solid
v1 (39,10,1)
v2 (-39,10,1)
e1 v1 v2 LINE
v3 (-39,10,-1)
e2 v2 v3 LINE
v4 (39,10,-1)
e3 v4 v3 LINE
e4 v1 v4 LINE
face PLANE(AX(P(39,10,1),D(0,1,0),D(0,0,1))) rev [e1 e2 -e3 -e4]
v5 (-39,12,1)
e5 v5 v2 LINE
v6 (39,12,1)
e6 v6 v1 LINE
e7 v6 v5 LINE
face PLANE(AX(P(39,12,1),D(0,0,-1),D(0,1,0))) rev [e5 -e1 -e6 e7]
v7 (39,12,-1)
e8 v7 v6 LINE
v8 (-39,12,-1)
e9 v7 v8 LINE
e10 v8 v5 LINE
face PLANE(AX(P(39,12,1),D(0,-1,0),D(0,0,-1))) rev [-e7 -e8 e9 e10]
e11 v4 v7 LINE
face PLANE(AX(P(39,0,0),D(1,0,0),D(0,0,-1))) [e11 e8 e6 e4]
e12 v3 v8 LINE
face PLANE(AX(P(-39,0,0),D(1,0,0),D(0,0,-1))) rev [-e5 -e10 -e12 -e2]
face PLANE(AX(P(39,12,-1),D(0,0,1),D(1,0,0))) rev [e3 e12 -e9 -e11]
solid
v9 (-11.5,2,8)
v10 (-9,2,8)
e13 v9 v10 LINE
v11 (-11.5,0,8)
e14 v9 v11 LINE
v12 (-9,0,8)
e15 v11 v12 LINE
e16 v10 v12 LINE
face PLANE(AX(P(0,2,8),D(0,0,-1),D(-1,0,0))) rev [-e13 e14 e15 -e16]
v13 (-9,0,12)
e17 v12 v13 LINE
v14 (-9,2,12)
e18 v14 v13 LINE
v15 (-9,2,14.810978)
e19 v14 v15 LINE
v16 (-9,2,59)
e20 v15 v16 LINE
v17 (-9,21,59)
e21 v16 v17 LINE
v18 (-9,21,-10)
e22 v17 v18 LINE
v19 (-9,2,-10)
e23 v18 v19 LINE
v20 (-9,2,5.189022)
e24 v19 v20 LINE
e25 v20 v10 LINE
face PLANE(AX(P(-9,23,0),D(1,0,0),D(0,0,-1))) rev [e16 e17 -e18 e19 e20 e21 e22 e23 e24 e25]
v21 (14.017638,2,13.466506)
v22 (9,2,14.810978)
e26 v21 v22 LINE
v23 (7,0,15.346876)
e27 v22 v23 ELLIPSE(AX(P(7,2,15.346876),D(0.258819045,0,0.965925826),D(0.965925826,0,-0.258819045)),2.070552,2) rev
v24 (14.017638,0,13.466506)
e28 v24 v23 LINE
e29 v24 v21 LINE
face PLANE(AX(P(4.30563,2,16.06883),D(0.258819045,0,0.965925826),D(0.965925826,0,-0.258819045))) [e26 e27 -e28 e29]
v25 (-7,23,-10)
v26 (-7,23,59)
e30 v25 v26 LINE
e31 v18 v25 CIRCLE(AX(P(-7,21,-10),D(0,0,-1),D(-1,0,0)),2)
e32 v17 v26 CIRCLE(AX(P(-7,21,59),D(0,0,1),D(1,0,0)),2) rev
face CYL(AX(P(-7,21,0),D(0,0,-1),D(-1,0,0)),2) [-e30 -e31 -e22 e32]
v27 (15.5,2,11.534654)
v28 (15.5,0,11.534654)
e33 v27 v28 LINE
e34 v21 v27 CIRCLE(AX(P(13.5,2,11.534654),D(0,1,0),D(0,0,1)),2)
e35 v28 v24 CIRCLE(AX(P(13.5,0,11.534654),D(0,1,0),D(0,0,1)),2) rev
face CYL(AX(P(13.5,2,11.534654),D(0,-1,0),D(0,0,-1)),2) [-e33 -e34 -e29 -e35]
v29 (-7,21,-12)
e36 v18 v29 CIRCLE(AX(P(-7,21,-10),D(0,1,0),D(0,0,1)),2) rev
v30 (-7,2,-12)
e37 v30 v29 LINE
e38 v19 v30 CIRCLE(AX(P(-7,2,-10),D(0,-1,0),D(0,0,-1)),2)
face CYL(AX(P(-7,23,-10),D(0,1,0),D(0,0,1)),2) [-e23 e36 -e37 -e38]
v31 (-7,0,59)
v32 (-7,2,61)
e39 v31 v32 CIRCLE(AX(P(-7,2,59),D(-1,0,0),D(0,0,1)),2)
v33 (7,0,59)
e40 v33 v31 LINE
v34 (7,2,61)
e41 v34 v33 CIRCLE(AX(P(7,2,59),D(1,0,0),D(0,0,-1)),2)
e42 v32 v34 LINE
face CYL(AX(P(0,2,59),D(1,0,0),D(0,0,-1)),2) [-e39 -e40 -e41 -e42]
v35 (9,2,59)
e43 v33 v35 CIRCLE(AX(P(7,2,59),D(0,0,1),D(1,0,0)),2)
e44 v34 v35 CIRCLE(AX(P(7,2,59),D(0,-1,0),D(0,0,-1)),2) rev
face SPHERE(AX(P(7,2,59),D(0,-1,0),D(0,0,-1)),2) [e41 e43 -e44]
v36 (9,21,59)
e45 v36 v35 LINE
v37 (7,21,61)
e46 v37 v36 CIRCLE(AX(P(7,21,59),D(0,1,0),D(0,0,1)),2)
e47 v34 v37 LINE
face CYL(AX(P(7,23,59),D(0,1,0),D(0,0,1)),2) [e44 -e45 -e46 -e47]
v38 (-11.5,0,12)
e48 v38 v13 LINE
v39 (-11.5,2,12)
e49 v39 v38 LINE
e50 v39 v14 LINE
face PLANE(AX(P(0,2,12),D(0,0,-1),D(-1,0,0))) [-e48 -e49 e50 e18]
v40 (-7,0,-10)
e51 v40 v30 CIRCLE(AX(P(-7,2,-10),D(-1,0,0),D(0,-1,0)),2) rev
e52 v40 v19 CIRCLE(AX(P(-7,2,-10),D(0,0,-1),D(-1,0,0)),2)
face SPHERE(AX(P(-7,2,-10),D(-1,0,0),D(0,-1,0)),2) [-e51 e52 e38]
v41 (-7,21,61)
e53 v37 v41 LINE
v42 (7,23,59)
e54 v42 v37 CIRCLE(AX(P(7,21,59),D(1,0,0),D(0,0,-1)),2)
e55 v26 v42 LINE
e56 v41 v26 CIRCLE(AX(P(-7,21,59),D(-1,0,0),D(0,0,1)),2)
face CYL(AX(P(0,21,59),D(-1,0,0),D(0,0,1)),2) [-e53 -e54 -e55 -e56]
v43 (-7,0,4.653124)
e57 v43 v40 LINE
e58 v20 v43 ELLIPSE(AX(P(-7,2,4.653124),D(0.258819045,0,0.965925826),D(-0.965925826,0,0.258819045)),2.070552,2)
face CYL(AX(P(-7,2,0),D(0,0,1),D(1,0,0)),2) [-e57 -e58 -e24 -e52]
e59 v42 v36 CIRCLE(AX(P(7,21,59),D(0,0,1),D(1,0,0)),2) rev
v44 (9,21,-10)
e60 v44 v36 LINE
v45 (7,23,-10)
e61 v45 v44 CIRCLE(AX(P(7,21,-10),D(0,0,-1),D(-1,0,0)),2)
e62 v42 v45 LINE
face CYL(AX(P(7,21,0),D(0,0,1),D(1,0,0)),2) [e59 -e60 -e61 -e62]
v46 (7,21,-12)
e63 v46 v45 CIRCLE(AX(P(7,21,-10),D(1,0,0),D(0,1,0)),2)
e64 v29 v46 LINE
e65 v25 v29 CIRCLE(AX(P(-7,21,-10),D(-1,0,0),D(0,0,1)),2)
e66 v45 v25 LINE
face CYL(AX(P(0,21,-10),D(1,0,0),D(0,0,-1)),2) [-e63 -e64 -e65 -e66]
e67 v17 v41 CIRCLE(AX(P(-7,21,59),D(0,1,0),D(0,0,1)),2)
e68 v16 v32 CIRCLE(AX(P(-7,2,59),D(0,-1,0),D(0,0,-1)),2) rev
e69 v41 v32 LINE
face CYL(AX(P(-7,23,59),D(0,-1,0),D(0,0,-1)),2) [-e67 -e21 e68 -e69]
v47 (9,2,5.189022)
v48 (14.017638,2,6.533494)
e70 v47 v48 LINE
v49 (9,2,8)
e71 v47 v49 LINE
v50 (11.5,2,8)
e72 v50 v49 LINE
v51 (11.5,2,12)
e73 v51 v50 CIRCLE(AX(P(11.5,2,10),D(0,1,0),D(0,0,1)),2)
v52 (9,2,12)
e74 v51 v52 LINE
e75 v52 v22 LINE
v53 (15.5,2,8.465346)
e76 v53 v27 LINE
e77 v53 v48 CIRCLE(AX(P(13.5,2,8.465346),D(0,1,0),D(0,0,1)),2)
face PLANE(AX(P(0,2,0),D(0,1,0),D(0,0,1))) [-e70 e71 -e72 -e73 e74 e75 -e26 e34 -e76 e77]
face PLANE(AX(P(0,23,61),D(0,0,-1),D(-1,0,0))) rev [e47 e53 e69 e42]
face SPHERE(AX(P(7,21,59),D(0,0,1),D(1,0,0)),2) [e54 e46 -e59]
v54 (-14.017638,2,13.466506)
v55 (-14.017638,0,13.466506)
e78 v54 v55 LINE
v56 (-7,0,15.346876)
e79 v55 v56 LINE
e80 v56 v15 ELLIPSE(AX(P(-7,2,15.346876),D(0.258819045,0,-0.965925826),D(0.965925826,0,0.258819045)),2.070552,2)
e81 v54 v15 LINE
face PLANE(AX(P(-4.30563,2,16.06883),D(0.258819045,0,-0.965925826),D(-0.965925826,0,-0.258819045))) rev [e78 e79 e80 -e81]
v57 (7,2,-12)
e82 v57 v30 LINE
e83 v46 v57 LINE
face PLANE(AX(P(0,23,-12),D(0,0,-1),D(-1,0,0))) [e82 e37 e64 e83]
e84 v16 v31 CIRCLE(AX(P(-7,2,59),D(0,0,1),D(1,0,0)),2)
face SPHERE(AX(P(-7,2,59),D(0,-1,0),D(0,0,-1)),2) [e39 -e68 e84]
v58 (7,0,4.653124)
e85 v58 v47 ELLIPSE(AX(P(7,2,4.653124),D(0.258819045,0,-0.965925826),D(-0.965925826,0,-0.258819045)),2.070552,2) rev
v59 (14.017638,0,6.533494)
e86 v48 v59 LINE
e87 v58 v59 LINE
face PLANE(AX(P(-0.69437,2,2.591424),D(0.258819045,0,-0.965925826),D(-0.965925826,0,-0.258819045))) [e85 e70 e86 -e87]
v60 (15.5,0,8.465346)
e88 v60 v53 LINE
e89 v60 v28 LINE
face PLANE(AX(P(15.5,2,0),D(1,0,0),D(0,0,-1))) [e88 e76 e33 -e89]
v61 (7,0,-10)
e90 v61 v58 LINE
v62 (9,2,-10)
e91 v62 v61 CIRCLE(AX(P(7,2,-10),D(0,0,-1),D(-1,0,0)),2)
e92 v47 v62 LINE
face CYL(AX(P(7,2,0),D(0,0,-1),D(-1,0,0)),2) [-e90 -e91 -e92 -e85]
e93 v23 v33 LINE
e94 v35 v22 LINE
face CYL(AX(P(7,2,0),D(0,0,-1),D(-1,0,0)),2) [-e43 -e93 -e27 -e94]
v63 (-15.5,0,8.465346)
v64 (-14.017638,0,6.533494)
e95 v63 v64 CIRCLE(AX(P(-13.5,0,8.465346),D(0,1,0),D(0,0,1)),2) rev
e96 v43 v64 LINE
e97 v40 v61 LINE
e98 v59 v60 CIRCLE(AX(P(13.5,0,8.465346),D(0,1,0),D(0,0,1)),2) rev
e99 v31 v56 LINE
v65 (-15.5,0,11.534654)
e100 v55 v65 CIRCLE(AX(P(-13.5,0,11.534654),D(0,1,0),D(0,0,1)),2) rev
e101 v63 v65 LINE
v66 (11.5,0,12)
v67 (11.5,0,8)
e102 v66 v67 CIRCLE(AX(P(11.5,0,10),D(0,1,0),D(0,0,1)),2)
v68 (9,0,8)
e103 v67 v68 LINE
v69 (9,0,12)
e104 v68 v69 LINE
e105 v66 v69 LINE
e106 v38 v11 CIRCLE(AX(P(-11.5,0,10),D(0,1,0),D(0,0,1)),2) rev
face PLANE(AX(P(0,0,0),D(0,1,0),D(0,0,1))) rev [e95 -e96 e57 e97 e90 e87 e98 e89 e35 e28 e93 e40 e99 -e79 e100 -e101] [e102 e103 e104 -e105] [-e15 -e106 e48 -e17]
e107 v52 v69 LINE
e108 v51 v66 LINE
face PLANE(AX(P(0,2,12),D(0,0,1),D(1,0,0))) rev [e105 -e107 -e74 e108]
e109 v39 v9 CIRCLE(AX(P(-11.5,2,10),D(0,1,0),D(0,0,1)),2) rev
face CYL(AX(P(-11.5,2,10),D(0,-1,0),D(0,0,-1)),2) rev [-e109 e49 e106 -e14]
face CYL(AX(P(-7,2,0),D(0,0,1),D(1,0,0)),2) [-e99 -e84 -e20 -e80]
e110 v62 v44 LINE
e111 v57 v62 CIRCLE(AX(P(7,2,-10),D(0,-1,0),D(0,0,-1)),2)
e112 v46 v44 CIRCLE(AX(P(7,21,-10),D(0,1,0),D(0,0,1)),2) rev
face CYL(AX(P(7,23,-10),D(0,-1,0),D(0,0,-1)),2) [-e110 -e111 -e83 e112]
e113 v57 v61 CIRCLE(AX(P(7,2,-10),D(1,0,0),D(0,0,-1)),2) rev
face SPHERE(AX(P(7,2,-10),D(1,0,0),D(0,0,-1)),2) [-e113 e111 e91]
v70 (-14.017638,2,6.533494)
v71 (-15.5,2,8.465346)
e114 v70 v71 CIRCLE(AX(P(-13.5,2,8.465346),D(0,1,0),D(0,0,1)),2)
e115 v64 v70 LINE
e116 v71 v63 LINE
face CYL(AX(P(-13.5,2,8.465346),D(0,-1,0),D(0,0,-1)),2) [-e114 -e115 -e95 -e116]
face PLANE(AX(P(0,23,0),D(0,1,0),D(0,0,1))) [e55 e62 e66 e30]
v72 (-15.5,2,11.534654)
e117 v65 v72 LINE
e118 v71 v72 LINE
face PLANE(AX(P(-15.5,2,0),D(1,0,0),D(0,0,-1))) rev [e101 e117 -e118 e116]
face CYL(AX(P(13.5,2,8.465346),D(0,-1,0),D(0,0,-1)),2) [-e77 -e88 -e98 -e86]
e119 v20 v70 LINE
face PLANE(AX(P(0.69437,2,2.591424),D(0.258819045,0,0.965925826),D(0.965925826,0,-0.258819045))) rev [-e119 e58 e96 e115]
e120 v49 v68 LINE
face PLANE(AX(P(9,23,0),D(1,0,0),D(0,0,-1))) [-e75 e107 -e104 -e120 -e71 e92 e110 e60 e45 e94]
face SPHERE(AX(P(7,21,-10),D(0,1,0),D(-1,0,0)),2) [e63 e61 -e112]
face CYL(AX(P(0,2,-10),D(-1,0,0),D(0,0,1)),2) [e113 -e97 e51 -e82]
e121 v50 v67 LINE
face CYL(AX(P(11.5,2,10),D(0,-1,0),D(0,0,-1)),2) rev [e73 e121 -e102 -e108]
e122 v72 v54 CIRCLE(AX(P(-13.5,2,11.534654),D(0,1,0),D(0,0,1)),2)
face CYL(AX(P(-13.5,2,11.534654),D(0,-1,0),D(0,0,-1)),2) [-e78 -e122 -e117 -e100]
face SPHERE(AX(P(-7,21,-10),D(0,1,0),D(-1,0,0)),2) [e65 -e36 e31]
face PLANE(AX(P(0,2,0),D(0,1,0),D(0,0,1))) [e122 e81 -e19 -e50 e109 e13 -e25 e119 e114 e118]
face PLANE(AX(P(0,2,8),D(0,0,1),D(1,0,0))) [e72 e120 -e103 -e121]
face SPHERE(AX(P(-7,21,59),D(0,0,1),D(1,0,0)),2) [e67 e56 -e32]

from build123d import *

# Parameters (mm, degrees)
HOLES_EXTRUDE_DEPTH      = 2
HOLES_EXTRUDE_2_DEPTH    = 2
MOTOR_START              = -9
MOTOR_EXTRUDE_OUTLINE_W  = 23
MOTOR_EXTRUDE_OUTLINE_H  = 73
MOTOR_EXTRUDE_DEPTH      = 18
SKETCH3_W                = 2
SKETCH3_H                = 2
LEFT_SHAFT_EXTRUDE_DEPTH = 39
MOTOR_EDGE_FILLET_R      = 2
HOLES_FILLET_R           = 2


# Read off the part's stored shape, not the designer's step: Motor Extrude
with BuildPart() as part:
    # Bottom Profile Sketch → Holes Extrude (new body)
    with BuildSketch(Plane(origin=(0, 0, 0), x_dir=(1, 0, 0), z_dir=(0, 1, 0))):
        with BuildLine():
            Line((-9, -8), (-9, -5.189022297))
            Line((-9, -5.189022297), (-15.5, -6.930692048))
            Line((-15.5, -6.930692048), (-15.5, -13.069307952))
            Line((-15.5, -13.069307952), (-9, -14.810977703))
            Line((-9, -14.810977703), (-9, -12))
            Line((-9, -12), (-11.5, -12))
            ThreePointArc((-11.5, -12), (-13.5, -10), (-11.5, -8))
            Line((-11.5, -8), (-9, -8))
        make_face()
    extrude(amount=HOLES_EXTRUDE_DEPTH)



with BuildPart() as body_2:
    # Bottom Profile Sketch → Holes Extrude 2 (new body)
    with BuildSketch(Plane(origin=(0, 0, 0), x_dir=(1, 0, 0), z_dir=(0, 1, 0))):
        with BuildLine():
            Line((15.5, -6.930692048), (9, -5.189022297))
            Line((9, -5.189022297), (9, -8))
            Line((9, -8), (11.5, -8))
            ThreePointArc((11.5, -8), (13.5, -10), (11.5, -12))
            Line((11.5, -12), (9, -12))
            Line((9, -12), (9, -14.810977703))
            Line((9, -14.810977703), (15.5, -13.069307952))
            Line((15.5, -13.069307952), (15.5, -6.930692048))
        make_face()
    extrude(amount=HOLES_EXTRUDE_2_DEPTH)


with BuildPart() as part_1:
    add(part.part)

    add(body_2.part)  # Motor Extrude merges body 2
    # Motor Extrude outline → Motor Extrude (add)
    with BuildSketch(Plane.YZ.offset(MOTOR_START)):
        with Locations((11.5, 24.5)):
            Rectangle(MOTOR_EXTRUDE_OUTLINE_W, MOTOR_EXTRUDE_OUTLINE_H)
    extrude(amount=MOTOR_EXTRUDE_DEPTH)

    # Motor Edge Fillet
    motor_edge_fillet_edges = [part_1.edges().sort_by_distance(p)[0] for p in [
        (0, 0, -12),
        (0, 23, -12),
        (9, 11.5, -12),
        (9, 0, -3.405488851),
        (9, 0, 37.905488851),
        (0, 0, 61),
        (0, 23, 61),
        (9, 11.5, 61),
        (-9, 11.5, 61),
        (-9, 0, -3.405488851),
        (-9, 0, 37.905488851),
        (-9, 11.5, -12),
        (-9, 23, 24.5),
        (9, 23, 24.5),
    ]]
    fillet(motor_edge_fillet_edges, radius=MOTOR_EDGE_FILLET_R)

    # Holes Fillet
    holes_fillet_edges = [part_1.edges().sort_by_distance(p)[0] for p in [
        (-15.5, 1, 13.069307952),
        (-15.5, 1, 6.930692048),
        (15.5, 1, 13.069307952),
        (15.5, 1, 6.930692048),
    ]]
    fillet(holes_fillet_edges, radius=HOLES_FILLET_R)


with BuildPart() as body_2_2:
    # Sketch3 → Left Shaft Extrude (new, symmetric)
    with BuildSketch(Plane(origin=(0, 0, 0), x_dir=(0, 0, -1), z_dir=(1, 0, 0))):
        with Locations((0, 11)):
            Rectangle(SKETCH3_W, SKETCH3_H)
    extrude(amount=LEFT_SHAFT_EXTRUDE_DEPTH, both=True)


solid = Compound([part_1.part, body_2_2.part])
